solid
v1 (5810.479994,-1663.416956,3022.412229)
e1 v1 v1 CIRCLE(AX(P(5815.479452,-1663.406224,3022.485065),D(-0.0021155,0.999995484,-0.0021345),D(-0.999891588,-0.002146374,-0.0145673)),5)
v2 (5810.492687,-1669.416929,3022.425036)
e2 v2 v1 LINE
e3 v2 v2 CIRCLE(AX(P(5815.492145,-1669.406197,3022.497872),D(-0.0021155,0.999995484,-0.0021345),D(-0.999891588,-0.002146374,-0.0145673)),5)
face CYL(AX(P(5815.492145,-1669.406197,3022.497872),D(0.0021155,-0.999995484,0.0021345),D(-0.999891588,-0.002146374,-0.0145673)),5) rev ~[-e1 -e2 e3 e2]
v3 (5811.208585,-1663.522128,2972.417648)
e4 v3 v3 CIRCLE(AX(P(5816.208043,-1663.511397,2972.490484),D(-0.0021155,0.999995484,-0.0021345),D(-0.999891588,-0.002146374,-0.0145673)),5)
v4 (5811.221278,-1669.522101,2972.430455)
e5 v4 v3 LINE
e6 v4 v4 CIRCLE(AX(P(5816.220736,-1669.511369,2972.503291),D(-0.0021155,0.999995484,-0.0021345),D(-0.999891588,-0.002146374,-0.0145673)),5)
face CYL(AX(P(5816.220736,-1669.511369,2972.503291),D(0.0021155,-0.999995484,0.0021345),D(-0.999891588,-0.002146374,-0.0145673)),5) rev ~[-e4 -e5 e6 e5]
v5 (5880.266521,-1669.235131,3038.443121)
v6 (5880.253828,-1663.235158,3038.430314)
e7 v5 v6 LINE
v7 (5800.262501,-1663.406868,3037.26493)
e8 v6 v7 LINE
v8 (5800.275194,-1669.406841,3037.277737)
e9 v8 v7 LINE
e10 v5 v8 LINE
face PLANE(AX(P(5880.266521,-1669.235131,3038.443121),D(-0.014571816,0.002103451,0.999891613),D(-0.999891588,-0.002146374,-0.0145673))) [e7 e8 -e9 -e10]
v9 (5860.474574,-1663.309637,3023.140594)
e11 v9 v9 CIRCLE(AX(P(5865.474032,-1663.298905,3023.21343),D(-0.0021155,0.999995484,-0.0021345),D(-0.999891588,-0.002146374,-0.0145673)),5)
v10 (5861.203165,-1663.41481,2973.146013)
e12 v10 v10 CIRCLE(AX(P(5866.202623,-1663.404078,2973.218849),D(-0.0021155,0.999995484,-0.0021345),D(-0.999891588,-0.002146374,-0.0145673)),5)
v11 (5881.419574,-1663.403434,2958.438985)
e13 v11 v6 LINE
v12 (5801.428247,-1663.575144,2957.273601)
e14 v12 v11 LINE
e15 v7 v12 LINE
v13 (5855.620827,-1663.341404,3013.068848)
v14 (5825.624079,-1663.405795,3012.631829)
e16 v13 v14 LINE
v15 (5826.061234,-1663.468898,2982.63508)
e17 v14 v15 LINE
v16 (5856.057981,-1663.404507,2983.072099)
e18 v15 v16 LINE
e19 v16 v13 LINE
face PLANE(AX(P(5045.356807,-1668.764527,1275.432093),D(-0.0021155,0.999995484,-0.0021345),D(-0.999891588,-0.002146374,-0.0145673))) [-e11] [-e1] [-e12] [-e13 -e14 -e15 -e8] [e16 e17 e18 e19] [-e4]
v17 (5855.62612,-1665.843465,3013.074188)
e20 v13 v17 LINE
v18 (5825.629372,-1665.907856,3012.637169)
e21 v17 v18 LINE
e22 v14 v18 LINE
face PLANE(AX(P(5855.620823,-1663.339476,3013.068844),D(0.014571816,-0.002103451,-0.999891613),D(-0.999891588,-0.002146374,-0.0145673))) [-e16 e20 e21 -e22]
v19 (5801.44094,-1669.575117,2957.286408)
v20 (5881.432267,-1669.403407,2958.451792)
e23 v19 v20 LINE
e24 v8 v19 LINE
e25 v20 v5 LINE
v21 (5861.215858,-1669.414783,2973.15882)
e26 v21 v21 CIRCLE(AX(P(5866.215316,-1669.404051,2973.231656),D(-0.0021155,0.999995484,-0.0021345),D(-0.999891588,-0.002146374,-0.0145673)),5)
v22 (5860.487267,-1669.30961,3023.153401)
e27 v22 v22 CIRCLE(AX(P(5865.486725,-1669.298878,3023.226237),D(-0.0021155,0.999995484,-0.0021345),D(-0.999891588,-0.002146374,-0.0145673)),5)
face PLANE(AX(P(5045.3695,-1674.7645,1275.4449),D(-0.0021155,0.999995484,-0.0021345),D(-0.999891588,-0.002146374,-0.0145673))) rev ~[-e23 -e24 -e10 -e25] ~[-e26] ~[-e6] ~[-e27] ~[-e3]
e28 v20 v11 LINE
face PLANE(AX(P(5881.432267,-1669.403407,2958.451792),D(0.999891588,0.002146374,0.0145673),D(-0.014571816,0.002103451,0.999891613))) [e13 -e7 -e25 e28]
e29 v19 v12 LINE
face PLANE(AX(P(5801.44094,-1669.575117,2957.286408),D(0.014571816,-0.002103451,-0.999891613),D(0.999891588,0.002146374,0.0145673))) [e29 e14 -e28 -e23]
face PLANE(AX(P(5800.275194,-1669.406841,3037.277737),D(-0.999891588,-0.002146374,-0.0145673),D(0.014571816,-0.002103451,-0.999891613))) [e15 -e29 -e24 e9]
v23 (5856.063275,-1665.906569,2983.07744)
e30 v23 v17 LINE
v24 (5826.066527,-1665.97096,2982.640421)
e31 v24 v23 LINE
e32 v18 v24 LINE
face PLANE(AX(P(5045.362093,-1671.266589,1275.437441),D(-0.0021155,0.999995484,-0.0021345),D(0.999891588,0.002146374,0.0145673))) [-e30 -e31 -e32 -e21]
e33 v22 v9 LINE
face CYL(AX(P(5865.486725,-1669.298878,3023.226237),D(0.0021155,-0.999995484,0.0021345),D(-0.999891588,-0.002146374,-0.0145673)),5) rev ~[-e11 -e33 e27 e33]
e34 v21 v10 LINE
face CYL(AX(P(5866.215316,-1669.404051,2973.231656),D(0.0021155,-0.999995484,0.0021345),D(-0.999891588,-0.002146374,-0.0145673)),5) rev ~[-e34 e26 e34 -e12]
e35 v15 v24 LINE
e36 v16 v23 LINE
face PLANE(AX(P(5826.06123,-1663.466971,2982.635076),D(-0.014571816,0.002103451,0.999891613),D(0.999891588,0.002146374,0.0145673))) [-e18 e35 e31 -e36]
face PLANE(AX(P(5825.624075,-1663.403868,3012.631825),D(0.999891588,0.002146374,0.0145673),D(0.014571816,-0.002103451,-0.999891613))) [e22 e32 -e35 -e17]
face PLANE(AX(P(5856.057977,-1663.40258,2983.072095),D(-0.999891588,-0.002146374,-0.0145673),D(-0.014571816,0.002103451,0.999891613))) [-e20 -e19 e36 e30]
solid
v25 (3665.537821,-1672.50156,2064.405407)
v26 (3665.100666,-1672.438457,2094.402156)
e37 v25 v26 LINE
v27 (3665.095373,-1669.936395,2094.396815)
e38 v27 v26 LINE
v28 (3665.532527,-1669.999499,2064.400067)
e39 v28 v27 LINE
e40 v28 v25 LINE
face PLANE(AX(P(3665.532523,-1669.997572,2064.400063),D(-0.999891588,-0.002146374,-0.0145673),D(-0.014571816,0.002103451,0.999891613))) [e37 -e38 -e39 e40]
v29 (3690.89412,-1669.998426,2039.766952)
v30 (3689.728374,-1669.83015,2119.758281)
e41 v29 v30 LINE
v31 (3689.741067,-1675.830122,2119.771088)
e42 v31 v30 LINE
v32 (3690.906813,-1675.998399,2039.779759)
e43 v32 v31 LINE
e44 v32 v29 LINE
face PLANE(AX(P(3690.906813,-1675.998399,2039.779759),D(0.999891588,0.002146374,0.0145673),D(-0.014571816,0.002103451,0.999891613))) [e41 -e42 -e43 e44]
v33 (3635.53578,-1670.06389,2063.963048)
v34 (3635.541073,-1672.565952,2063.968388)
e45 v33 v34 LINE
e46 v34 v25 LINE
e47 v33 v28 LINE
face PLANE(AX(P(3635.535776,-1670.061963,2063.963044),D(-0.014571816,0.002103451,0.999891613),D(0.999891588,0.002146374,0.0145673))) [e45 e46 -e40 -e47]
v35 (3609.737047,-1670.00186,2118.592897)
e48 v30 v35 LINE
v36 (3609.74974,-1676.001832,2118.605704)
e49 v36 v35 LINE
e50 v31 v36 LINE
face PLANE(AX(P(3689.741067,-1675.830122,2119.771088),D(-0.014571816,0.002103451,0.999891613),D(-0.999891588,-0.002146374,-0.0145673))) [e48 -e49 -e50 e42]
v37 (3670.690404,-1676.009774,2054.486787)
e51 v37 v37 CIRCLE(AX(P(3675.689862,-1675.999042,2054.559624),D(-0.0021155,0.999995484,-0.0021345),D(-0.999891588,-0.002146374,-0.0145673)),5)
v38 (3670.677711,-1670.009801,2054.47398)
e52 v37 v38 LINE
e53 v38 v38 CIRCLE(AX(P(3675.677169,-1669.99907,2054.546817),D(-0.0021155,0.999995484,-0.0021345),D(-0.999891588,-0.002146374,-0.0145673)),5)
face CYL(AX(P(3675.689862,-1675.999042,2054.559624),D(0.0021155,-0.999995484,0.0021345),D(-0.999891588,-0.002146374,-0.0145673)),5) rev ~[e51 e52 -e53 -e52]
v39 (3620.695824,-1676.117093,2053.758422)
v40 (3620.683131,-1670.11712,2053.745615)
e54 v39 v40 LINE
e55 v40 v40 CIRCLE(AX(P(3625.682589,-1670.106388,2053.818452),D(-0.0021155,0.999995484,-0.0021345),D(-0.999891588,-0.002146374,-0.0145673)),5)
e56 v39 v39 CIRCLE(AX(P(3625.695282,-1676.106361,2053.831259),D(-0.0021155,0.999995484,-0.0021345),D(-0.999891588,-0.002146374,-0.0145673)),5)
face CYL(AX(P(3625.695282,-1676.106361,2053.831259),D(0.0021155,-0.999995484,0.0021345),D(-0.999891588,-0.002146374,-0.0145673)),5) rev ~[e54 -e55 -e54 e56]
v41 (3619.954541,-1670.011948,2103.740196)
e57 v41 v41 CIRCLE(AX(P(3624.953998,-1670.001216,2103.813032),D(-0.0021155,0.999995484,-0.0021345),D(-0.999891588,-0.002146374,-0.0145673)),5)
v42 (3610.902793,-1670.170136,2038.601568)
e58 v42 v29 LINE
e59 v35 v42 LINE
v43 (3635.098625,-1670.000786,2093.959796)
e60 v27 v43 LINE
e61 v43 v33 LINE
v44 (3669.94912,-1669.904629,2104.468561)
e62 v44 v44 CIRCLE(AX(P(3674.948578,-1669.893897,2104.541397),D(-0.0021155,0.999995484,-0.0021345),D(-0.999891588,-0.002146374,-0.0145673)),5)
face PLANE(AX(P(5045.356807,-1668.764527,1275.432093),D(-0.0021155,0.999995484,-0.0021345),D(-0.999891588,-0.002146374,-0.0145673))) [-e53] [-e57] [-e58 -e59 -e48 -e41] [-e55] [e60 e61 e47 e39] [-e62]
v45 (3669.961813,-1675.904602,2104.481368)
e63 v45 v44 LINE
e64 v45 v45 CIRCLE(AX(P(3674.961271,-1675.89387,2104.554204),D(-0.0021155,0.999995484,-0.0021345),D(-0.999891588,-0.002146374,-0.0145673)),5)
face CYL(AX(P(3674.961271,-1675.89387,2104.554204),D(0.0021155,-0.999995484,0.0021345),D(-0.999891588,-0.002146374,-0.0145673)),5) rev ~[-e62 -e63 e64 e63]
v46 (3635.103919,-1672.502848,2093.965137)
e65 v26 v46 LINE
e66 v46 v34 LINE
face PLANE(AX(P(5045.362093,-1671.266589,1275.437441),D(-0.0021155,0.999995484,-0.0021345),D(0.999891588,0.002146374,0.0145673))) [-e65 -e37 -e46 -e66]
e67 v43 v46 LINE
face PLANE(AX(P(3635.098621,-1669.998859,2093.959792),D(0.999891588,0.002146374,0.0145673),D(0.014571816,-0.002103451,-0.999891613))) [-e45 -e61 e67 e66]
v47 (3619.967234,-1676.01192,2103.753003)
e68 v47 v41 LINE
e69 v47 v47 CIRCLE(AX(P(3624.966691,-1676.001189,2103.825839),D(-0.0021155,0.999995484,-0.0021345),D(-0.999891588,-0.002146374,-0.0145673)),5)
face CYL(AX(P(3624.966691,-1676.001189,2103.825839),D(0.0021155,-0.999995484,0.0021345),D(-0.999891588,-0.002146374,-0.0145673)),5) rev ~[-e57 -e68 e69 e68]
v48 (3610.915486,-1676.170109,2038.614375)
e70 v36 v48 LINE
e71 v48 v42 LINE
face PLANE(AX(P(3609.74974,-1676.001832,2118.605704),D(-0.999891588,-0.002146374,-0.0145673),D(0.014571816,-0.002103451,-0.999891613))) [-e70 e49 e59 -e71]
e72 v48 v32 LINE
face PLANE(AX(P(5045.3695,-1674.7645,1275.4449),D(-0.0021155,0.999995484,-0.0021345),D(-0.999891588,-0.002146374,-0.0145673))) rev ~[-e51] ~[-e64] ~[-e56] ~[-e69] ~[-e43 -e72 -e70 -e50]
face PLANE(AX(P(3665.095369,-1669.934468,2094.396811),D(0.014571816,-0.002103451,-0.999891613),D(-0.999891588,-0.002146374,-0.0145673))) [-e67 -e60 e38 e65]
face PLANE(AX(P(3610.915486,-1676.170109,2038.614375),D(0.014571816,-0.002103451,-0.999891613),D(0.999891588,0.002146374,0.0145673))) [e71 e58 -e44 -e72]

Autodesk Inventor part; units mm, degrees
ref_plane "YZ Plane" through (0, 0, 0) normal (1, 0, 0) x (0, 1, 0)
ref_plane "XZ Plane" through (0, 0, 0) normal (0, 1, 0) x (-1, 0, 0)
ref_plane "XY Plane" through (0, 0, 0) normal (0, 0, 1) x (1, 0, 0)
ref_plane "Plano de trabajo1" through (5045.3695, -1674.7645, 1275.4449) normal (-0.0021155, 0.9999955, -0.0021345) x (-0.9998916, -0.0021464, -0.0145673)
sketch "Boceto1" plane through (5045.3695, -1674.7645, 1275.4449) normal (-0.0021155, 0.9999955, -0.0021345) x (-0.9998916, -0.0021464, -0.0145673)
  line L0 (-860.5005, 1150.6528) -> (-860.5005, 1750.6528)
  line L1 (-860.5005, 1750.6528) -> (839.4995, 1750.6528)
  line L2 (-13.7894, 1495.6811) -> (-13.7894, 1723.4426)
  line L3 (-780.5005, 1750.6528) -> (-780.5005, 1670.6528)
  circle A0 centre (-795.5005, 1685.6528) radius 5
  circle A1 centre (-795.5005, 1735.6528) radius 5
  circle A2 centre (-845.5005, 1685.6528) radius 5
  circle A3 centre (-845.5005, 1735.6528) radius 5
  line L4 (-780.5005, 1670.6528) -> (-860.5005, 1670.6528)
  line L5 (1423.1842, 863.9864) -> (1423.1842, -832.9469)
  line L6 (823.1842, 863.9864) -> (1423.1842, 863.9864)
  line L7 (1423.1842, 863.9864) -> (1423.1842, 783.9864)
  line L8 (1423.1842, 783.9864) -> (1343.1842, 783.9864)
  line L9 (1343.1842, 783.9864) -> (1343.1842, 863.9864)
  line L10 (1343.1842, 863.9864) -> (1423.1842, 863.9864)
  circle A4 centre (1408.1842, 848.9864) radius 5
  circle A5 centre (1408.1842, 798.9864) radius 5
  circle A6 centre (1358.1842, 848.9864) radius 5
  circle A7 centre (1358.1842, 798.9864) radius 5
  line L11 (-805.5005, 1695.6528) -> (-835.5005, 1695.6528)
  line L12 (-835.5005, 1695.6528) -> (-835.5005, 1725.6528)
  line L13 (-835.5005, 1725.6528) -> (-805.5005, 1725.6528)
  line L14 (-805.5005, 1725.6528) -> (-805.5005, 1695.6528)
  line L15 (1398.1842, 808.9864) -> (1368.1842, 808.9864)
  line L16 (1368.1842, 808.9864) -> (1368.1842, 838.9864)
  line L17 (1368.1842, 838.9864) -> (1398.1842, 838.9864)
  line L18 (1398.1842, 838.9864) -> (1398.1842, 808.9864)
  point P0 (5059.8075, -1198.2636)
  point P1 (1343.1842, 863.9864)
  point P2 (1423.1842, 783.9864)
  point P3 (-820.5005, 1670.6528)
  point P4 (-805.5005, 1710.6528)
  point P5 (1383.1842, 808.9864)
  dimension "d0" = 1700
  dimension "d1" = 600
  dimension "d17" = 80
  dimension "d18" = 80
  dimension "d21" = 10
  dimension "d22" = 15
  dimension "d23" = 15
  dimension "d35" = 30
  dimension "d36" = 30
  dimension "d37" = 25
  dimension "d38" = 25
  dimension "d39" = 30
  dimension "d40" = 30
  dimension "d41" = 25
  dimension "d42" = 25
  dimension "d45" = 15
  dimension "d46" = 15
  dimension "d47" = 15
  dimension "d48" = 15
  dimension "d49" = 15
  dimension "d50" = 15
  dimension "d51" = 15
extrude "Extrusión1" add sketch "Boceto1" along normal blind 6 contours L0 L1 L3 L4 | L5 L8 L9 L6 | L11 L12 L13 L14 | L15 L16 L17 L18
ref_plane "Plano de trabajo2" through (5045.3568, -1668.7646, 1275.4321) normal (-0.0021155, 0.9999955, -0.0021345) x (0.9998916, 0.0021464, 0.0145673)
sketch "Boceto3" plane through (5045.3568, -1668.7646, 1275.4321) normal (-0.0021155, 0.9999955, -0.0021345) x (0.9998916, 0.0021464, 0.0145673)
  line L0 (805.5005, -1695.6528) -> (835.5005, -1695.6528)
  line L1 (835.5005, -1695.6528) -> (835.5005, -1725.6528)
  line L2 (835.5005, -1725.6528) -> (805.5005, -1725.6528)
  line L3 (805.5005, -1725.6528) -> (805.5005, -1695.6528)
  line L4 (860.5005, -1670.6528) -> (780.5005, -1670.6528) projected
  line L5 (780.5005, -1670.6528) -> (780.5005, -1750.6528) projected
  line L6 (-1398.1842, -808.9864) -> (-1368.1842, -808.9864)
  line L7 (-1368.1842, -808.9864) -> (-1368.1842, -838.9864)
  line L8 (-1368.1842, -838.9864) -> (-1398.1842, -838.9864)
  line L9 (-1398.1842, -838.9864) -> (-1398.1842, -808.9864)
  line L10 (-1343.1842, -863.9864) -> (-1343.1842, -783.9864) projected
  line L11 (-1343.1842, -783.9864) -> (-1423.1842, -783.9864) projected
  point P0 (-5059.8075, 1198.2636)
  point P1 (820.5005, -1670.6528)
  point P2 (820.5005, -1695.6528)
  point P3 (780.5005, -1710.6528)
  point P4 (-1343.1842, -823.9864)
  point P5 (-1368.1842, -823.9864)
  point P6 (-1383.1842, -808.9864)
  dimension "d52" = 30
  dimension "d53" = 30
  dimension "d54" = 25
  dimension "d55" = 25
  dimension "d56" = 30
  dimension "d57" = 30
  dimension "d59" = 25
  dimension "d60" = 25
extrude "Extrusión3" cut sketch "Boceto3" against normal blind 2.5
properties part number "Mesa"
